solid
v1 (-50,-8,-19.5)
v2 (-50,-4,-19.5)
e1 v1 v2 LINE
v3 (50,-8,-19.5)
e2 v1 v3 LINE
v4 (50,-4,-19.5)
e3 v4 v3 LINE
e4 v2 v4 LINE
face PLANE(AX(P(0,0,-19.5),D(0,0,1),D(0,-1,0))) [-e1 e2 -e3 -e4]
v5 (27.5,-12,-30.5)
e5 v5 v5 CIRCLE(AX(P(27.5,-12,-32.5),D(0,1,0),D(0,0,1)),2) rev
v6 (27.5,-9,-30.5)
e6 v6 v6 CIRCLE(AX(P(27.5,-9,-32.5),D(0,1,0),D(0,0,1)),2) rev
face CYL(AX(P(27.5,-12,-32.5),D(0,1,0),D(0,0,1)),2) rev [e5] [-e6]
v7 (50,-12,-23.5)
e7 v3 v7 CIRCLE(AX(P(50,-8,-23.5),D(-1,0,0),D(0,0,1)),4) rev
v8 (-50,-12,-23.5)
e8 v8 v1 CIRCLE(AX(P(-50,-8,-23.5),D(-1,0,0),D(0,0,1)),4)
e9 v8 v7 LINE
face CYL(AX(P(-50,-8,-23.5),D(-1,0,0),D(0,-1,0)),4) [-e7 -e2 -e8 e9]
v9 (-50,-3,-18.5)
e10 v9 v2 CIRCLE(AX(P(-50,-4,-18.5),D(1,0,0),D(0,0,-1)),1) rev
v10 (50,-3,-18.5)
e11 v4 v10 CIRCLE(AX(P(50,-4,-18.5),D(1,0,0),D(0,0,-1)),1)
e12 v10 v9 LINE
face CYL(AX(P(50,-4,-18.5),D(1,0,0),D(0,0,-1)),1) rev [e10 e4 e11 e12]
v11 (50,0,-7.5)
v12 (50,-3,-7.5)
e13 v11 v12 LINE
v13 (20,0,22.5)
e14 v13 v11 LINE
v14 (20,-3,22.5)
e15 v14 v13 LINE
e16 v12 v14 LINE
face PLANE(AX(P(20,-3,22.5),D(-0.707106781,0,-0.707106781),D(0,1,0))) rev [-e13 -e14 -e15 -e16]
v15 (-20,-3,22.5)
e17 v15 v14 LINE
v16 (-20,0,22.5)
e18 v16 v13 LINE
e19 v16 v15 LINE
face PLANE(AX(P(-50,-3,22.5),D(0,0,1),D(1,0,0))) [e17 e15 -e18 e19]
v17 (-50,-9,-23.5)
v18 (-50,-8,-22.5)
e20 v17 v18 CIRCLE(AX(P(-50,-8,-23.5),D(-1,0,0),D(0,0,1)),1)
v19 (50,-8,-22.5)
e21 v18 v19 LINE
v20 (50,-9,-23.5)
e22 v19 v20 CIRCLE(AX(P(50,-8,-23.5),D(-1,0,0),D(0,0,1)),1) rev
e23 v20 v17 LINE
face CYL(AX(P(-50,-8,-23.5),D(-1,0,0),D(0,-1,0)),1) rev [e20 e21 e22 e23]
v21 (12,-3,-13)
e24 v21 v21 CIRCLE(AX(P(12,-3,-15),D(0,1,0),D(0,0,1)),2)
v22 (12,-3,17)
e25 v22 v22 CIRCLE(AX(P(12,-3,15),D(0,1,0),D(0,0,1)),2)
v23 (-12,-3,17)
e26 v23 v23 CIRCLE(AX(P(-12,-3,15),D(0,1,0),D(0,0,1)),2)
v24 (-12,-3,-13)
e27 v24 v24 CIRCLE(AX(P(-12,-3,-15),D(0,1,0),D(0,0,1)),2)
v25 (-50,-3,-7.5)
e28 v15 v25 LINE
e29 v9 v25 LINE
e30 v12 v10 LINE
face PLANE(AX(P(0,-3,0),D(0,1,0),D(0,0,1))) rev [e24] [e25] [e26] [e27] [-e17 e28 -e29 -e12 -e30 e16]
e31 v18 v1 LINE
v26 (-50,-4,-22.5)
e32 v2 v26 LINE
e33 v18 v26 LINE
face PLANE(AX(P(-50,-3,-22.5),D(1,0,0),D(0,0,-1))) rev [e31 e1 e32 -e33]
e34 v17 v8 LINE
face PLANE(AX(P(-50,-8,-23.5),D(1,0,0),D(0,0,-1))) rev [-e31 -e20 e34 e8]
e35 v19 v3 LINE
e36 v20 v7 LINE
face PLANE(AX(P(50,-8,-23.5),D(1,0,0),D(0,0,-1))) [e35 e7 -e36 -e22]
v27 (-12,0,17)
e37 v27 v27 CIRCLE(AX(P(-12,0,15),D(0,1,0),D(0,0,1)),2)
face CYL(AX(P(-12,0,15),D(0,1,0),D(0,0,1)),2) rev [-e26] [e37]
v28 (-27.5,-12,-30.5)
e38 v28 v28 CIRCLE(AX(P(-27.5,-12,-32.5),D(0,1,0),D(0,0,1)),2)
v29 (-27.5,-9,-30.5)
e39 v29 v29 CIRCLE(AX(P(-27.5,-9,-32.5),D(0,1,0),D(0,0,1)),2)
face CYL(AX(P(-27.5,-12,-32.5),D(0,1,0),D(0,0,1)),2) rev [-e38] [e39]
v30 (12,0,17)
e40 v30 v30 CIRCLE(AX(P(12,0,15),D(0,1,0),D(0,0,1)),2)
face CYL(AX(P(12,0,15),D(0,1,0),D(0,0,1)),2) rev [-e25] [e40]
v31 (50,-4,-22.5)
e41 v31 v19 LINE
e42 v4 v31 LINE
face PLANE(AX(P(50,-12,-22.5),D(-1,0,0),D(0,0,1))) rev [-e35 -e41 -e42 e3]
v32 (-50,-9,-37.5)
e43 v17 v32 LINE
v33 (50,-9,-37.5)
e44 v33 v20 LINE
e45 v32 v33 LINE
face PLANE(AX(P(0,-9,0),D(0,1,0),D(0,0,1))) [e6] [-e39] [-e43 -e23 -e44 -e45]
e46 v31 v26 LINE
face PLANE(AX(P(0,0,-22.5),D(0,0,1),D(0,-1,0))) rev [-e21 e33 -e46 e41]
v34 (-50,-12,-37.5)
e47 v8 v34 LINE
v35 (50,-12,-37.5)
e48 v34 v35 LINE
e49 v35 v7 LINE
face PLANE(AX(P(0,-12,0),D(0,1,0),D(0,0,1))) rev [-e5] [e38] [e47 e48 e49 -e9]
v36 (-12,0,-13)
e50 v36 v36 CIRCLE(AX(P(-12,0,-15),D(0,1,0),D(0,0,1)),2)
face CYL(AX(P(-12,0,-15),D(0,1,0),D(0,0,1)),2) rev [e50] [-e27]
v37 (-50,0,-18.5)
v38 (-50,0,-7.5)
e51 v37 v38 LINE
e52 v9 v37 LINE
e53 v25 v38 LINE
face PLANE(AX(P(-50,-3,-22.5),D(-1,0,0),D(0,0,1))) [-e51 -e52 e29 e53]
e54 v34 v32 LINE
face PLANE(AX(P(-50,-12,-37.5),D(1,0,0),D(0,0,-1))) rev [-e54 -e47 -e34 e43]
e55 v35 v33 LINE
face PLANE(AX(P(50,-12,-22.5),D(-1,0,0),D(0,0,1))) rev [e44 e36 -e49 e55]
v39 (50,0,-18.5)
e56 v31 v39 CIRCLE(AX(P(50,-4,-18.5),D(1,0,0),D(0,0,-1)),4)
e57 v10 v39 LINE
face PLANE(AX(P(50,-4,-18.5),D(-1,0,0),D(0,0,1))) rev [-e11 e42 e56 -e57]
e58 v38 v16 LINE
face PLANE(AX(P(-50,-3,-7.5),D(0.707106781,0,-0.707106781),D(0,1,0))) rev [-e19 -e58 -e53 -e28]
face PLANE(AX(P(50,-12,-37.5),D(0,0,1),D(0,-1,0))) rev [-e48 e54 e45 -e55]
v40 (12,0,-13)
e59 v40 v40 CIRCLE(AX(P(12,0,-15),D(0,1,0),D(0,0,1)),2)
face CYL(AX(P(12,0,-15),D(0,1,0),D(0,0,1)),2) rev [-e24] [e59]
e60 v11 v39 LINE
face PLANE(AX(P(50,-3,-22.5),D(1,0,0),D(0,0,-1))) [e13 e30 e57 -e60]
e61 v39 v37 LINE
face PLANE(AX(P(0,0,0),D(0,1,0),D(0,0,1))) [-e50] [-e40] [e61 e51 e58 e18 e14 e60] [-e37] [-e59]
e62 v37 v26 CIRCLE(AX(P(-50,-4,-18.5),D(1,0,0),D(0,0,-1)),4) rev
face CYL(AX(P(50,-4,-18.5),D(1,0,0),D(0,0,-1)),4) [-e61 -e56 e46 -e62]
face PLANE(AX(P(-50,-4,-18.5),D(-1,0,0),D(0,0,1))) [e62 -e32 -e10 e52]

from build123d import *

# Parameters (mm, degrees)
SKETCH1_W                    = 100
SKETCH1_H                    = 45
BASE_FLANGE1_DEPTH           = 3
EDGE_FLANGE1_STRIP_W         = 14
EDGE_FLANGE1_STRIP_H         = 3
EDGE_FLANGE1_STRIP_CUT_DEPTH = 100
EDGE_FLANGE1_DEPTH           = 100
EDGE_FLANGE2_STRIP_W         = 14
EDGE_FLANGE2_STRIP_H         = 3
EDGE_FLANGE2_STRIP_CUT_DEPTH = 100
EDGE_FLANGE2_DEPTH           = 100
SKETCH12_R                   = 2
CUT_EXTRUDE1_DEPTH           = 64.144675152
F_4_0MM_DOWEL_HOLE1_D        = 4
F_4_0MM_DOWEL_HOLE1_DEPTH    = 12.4
F_4_0MM_DOWEL_HOLE1_TIP      = 1.201721238
CHAMFER1_SIZE                = 30


# Sheet-metal steps are written as plain solids
with BuildPart() as part:
    # Sketch1 → Base-Flange1 (new body)
    with BuildSketch(Plane(origin=(0, 0, 0), x_dir=(1, 0, 0), z_dir=(0, 1, 0))):
        Rectangle(SKETCH1_W, SKETCH1_H)
    extrude(amount=-BASE_FLANGE1_DEPTH)

    # Edge-Flange1 strip (across the edge) → Edge-Flange1 strip cut (cut)
    with BuildSketch(Plane(origin=(-50, -3, -22.5), x_dir=(0, 0, 1), z_dir=(1, 0, 0))):
        with Locations((-3, -1.5)):
            Rectangle(EDGE_FLANGE1_STRIP_W, EDGE_FLANGE1_STRIP_H)
    extrude(amount=EDGE_FLANGE1_STRIP_CUT_DEPTH, mode=Mode.SUBTRACT)

    # Edge-Flange1 section (across the edge) → Edge-Flange1 (add)
    with BuildSketch(Plane(origin=(-50, -3, -22.5), x_dir=(0, 0, 1), z_dir=(1, 0, 0))):
        with BuildLine():
            Line((0, 1), (0, 9))
            Line((0, 9), (3, 9))
            Line((3, 9), (3, 1))
            ThreePointArc((3, 1), (3.292893219, 0.292893219), (4, 0))
            Line((4, 0), (4, -3))
            ThreePointArc((4, -3), (1.171572875, -1.828427125), (0, 1))
        make_face()
    extrude(amount=EDGE_FLANGE1_DEPTH)

    # Edge-Flange2 strip (across the edge) → Edge-Flange2 strip cut (cut)
    with BuildSketch(Plane(origin=(50, -12, -22.5), x_dir=(0, 1, 0), z_dir=(-1, 0, 0))):
        with Locations((-3, -1.5)):
            Rectangle(EDGE_FLANGE2_STRIP_W, EDGE_FLANGE2_STRIP_H)
    extrude(amount=EDGE_FLANGE2_STRIP_CUT_DEPTH, mode=Mode.SUBTRACT)

    # Edge-Flange2 section (across the edge) → Edge-Flange2 (add)
    with BuildSketch(Plane(origin=(50, -12, -22.5), x_dir=(0, 1, 0), z_dir=(-1, 0, 0))):
        with BuildLine():
            Line((0, 1), (0, 15))
            Line((0, 15), (3, 15))
            Line((3, 15), (3, 1))
            ThreePointArc((3, 1), (3.292893219, 0.292893219), (4, 0))
            Line((4, 0), (4, -3))
            ThreePointArc((4, -3), (1.171572875, -1.828427125), (0, 1))
        make_face()
    extrude(amount=EDGE_FLANGE2_DEPTH)

    # Sketch12 → Cut-Extrude1 (cut, through all)
    with BuildSketch(Plane(origin=(0, -9, 0), x_dir=(1, 0, 0), z_dir=(0, 1, 0))):
        with Locations(Location((-27.5, 32.5, 0), (0, 0, 270))):
            Circle(SKETCH12_R)
        with Locations(Location((27.5, 32.5, 0), (0, 0, 270))):
            Circle(SKETCH12_R)
    extrude(amount=-CUT_EXTRUDE1_DEPTH, mode=Mode.SUBTRACT)

    # Ø4.0mm Dowel Hole1
    with Locations(Plane(origin=(12, 0, -15), x_dir=(0, 0, 1), z_dir=(0, 1, 0))):
        with Locations((0, 0), (30, 0), (30, -24), (0, -24)):
            Hole(F_4_0MM_DOWEL_HOLE1_D / 2, depth=F_4_0MM_DOWEL_HOLE1_DEPTH)
            with Locations((0, 0, -(F_4_0MM_DOWEL_HOLE1_DEPTH + F_4_0MM_DOWEL_HOLE1_TIP / 2))):  # 118° drill point
                Cone(0, F_4_0MM_DOWEL_HOLE1_D / 2, F_4_0MM_DOWEL_HOLE1_TIP, mode=Mode.SUBTRACT)

    # Chamfer1
    chamfer1_edges = [part.edges().sort_by_distance(p)[0] for p in [
        (50, -1.5, 22.5),
        (-50, -1.5, 22.5),
    ]]
    chamfer(chamfer1_edges, length=CHAMFER1_SIZE)


solid = part.part
